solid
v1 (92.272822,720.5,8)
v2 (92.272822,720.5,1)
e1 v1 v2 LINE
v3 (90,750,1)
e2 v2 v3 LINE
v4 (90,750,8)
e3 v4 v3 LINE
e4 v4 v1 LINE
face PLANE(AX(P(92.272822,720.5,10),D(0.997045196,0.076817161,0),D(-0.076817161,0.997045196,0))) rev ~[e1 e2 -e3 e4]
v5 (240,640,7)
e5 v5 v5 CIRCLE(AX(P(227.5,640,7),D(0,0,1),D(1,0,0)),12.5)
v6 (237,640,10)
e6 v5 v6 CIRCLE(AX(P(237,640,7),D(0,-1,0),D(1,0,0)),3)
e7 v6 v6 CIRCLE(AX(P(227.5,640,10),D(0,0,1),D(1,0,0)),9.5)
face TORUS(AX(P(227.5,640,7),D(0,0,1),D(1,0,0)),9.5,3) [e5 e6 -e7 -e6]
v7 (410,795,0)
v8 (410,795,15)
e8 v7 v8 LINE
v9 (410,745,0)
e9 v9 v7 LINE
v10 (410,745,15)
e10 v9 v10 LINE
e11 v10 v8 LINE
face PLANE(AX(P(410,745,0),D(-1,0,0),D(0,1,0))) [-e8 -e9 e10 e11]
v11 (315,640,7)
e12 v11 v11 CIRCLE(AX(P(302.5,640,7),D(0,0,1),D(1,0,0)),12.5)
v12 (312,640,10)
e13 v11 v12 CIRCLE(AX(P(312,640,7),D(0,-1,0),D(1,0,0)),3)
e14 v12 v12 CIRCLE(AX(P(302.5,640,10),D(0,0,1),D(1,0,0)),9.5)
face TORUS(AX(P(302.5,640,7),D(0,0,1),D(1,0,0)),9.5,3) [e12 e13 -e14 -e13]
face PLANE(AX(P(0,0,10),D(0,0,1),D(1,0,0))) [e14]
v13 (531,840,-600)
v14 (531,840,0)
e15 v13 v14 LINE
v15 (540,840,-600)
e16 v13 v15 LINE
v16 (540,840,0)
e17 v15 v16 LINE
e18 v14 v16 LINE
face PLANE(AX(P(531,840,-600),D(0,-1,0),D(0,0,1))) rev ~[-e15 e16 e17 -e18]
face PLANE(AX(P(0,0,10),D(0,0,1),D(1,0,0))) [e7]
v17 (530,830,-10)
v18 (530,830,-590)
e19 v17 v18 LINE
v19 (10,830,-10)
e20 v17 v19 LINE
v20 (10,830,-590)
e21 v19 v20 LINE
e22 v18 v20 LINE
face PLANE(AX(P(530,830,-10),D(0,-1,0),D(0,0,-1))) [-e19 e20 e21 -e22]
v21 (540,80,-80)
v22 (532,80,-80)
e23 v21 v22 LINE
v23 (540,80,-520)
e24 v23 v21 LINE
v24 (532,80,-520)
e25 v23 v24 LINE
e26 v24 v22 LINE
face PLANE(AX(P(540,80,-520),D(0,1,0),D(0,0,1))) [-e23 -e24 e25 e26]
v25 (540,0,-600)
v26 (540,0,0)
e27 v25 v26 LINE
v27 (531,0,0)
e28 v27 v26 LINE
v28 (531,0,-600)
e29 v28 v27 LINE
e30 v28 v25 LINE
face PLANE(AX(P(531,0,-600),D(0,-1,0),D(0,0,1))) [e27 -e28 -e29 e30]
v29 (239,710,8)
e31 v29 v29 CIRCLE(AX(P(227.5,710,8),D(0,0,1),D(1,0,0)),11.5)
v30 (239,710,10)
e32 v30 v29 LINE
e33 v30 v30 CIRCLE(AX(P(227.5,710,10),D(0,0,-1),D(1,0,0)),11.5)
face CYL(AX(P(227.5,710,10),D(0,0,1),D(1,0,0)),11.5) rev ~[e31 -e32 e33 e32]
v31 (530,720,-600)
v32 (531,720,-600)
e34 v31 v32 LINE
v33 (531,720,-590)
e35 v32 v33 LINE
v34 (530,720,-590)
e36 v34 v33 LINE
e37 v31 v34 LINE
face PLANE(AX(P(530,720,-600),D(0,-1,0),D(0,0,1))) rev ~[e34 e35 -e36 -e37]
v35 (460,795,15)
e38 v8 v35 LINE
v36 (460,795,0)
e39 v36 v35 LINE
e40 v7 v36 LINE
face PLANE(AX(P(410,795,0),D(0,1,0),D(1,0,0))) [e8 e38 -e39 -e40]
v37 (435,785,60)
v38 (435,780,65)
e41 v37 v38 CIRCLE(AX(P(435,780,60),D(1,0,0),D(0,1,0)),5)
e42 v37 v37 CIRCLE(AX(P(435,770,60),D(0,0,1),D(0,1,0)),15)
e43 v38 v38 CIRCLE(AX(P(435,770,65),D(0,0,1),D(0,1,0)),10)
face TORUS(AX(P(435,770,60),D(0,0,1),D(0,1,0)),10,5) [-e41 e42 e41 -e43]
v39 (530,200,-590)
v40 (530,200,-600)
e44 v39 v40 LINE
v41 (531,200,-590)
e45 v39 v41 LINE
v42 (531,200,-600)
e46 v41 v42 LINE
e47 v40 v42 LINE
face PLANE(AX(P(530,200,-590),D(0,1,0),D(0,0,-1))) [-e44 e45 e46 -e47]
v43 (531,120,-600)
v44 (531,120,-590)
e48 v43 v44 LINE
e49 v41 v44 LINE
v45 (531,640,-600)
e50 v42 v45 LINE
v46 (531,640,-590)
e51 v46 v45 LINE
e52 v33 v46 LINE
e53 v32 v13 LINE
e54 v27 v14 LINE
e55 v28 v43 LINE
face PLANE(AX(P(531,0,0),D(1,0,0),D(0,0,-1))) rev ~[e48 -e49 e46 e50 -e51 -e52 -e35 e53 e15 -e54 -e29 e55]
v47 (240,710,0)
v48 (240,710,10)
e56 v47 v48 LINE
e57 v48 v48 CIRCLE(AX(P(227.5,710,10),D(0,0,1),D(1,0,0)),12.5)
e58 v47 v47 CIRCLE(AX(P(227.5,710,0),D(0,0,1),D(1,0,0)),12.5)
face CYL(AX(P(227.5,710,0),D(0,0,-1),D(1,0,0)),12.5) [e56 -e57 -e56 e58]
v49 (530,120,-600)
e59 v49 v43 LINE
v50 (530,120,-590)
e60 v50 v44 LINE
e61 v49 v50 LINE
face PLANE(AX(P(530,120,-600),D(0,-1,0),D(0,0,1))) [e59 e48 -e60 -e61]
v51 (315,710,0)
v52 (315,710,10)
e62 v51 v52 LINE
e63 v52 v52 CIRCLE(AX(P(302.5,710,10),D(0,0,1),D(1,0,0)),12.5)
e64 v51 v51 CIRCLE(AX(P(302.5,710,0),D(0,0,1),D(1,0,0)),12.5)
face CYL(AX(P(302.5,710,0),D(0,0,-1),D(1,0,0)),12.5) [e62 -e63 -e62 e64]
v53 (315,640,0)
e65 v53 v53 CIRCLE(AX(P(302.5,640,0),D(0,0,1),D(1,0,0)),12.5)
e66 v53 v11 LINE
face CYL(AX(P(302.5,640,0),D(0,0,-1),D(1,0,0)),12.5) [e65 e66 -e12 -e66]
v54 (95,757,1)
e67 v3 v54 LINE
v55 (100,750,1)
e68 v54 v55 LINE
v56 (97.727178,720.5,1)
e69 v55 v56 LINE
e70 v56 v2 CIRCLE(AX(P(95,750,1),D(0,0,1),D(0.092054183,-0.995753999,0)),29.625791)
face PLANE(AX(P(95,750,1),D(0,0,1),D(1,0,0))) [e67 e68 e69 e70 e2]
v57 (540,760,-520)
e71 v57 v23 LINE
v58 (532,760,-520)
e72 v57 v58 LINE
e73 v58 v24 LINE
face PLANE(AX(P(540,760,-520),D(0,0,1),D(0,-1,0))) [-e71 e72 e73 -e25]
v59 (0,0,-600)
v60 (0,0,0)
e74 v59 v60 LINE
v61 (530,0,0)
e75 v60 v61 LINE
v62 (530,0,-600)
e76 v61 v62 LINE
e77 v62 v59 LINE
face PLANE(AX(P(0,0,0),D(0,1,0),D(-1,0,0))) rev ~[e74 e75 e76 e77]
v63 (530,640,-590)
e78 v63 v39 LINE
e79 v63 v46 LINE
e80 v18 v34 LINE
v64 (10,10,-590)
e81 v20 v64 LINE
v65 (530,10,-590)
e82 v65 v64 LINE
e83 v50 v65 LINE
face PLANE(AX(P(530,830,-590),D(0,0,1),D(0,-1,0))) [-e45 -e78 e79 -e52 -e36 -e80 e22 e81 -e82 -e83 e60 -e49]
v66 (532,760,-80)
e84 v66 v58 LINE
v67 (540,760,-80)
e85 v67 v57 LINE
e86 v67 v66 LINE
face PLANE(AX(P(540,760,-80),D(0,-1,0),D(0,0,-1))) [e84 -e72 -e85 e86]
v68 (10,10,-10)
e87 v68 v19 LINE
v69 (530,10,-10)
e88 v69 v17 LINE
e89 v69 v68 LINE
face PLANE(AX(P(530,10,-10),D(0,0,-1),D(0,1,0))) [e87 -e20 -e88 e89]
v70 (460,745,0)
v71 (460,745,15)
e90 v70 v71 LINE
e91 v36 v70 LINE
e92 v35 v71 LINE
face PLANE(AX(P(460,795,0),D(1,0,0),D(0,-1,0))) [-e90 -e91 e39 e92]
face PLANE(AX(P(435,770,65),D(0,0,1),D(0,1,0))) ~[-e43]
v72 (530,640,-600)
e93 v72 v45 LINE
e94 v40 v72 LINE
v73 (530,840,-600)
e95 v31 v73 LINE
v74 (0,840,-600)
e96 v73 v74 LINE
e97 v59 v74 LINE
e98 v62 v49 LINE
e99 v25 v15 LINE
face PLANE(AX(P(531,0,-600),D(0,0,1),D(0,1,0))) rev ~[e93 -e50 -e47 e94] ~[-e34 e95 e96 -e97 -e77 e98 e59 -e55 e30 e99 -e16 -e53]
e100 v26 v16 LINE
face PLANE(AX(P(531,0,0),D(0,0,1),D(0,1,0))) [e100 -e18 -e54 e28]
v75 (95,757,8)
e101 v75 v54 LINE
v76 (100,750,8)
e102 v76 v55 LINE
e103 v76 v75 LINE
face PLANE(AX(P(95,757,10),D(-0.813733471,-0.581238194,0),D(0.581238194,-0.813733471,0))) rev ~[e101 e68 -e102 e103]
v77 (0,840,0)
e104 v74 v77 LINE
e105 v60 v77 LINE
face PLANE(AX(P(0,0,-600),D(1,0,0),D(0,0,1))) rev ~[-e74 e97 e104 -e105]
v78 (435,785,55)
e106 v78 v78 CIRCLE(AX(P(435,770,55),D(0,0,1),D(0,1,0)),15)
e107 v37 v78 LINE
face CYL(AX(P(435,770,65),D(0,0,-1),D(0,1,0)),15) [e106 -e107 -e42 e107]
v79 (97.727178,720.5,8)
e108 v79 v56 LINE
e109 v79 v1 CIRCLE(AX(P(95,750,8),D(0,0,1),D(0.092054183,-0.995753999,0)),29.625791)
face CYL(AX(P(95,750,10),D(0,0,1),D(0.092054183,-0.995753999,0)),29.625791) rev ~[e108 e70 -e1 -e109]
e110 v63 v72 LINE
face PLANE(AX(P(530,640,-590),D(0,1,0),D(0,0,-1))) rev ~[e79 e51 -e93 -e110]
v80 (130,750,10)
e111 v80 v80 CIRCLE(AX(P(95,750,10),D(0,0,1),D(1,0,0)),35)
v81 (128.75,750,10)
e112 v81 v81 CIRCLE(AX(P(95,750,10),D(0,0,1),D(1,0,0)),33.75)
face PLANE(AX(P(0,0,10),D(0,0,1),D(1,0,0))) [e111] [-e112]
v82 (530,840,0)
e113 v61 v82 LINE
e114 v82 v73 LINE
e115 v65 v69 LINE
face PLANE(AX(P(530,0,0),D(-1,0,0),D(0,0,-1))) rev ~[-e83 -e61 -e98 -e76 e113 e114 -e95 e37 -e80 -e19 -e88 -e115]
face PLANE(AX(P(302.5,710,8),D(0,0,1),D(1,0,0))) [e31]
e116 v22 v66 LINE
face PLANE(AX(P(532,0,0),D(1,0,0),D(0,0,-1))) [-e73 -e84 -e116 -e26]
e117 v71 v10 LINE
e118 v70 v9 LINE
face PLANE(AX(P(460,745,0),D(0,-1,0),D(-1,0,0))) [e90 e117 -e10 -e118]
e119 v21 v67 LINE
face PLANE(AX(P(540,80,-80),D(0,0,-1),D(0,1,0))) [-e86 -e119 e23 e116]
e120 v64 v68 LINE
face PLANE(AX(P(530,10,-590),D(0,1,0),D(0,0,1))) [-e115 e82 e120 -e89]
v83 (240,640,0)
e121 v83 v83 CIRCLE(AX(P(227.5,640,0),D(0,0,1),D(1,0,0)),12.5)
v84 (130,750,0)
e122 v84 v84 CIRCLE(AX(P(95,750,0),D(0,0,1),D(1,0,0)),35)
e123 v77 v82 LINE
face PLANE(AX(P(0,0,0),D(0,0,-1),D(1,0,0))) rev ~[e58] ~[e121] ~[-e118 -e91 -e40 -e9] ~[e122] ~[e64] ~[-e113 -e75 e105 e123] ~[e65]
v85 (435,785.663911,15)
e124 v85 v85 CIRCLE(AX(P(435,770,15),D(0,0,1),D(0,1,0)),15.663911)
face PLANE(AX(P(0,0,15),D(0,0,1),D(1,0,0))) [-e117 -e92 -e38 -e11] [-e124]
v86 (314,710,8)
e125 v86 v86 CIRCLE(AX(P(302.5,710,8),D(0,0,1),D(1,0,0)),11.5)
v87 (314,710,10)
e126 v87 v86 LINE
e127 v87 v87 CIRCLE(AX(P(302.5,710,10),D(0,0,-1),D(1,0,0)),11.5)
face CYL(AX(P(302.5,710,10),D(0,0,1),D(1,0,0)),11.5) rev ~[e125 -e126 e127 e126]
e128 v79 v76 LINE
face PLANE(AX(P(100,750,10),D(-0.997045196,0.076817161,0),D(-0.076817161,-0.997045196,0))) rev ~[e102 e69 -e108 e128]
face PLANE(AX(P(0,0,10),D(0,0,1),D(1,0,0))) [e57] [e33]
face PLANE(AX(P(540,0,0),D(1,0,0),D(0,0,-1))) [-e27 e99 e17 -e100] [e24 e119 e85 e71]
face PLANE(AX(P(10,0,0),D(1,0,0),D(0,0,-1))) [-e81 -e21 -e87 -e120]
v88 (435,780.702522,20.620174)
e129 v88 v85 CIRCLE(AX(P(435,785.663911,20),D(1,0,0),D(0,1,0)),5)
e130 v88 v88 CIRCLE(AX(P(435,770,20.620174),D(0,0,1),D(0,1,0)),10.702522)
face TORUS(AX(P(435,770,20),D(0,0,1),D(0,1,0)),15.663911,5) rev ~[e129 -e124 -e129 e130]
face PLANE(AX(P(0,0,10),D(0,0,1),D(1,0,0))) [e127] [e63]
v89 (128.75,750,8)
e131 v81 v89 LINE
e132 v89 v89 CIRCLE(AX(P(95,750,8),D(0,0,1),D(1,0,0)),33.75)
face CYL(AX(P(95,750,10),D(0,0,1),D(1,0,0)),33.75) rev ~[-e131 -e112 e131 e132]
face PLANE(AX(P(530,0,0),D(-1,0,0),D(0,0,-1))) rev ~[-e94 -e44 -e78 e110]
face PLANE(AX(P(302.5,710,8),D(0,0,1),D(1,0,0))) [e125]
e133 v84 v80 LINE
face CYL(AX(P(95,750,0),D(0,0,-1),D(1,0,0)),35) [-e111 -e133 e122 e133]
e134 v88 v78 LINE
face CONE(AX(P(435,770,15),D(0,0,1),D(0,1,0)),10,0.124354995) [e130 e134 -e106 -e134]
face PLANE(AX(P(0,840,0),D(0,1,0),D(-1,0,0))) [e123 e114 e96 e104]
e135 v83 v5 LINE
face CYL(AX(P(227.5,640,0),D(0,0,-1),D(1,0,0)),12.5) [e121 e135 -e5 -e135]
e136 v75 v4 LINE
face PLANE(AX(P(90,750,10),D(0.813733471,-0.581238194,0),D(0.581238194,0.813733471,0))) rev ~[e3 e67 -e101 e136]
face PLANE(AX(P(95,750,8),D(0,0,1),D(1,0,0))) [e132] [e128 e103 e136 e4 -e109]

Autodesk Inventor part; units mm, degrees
ref_plane "YZ Plane" through (0, 0, 0) normal (1, 0, 0) x (0, 1, 0)
ref_plane "XZ Plane" through (0, 0, 0) normal (0, 1, 0) x (-1, 0, 0)
ref_plane "XY Plane" through (0, 0, 0) normal (0, 0, 1) x (1, 0, 0)
sketch "Boceto1" plane through (0, 0, 0) normal (0, 1, 0) x (-1, 0, 0)
  line L0 (0, 0) -> (-530, 0)
  line L1 (-530, 0) -> (-530, -600)
  line L2 (-530, -600) -> (0, -600)
  line L3 (0, -600) -> (0, 0)
  dimension "d0" = 530
  dimension "d1" = 600
extrude "Extrusión1" add sketch "Boceto1" along normal blind 840
sketch "Boceto2" plane through (530, 0, 0) normal (1, 0, 0) x (0, 0, -1)
  line L0 (0, 0) -> (0, 840) projected
  line L1 (0, 840) -> (10, 840)
  line L2 (10, 840) -> (10, 830)
  line L3 (10, 830) -> (0, 830)
  line L4 (0, 830) -> (0, 840)
  line L5 (10, 830) -> (590, 830)
  line L6 (590, 830) -> (590, 10)
  line L7 (590, 10) -> (10, 10)
  line L8 (10, 10) -> (10, 830)
  dimension "d4" = 10
  dimension "d5" = 10
  dimension "d6" = 580
  dimension "d7" = 820
extrude "Extrusión2" cut sketch "Boceto2" against normal blind 520 contours L5 L6 L7 L8
sketch "Boceto3" plane through (0, 0, 0) normal (0, 0, 1) x (1, 0, 0)
  line L0 (530, 830) -> (10, 830) projected
  line L1 (10, 830) -> (520, 830) construction
  line L2 (520, 830) -> (520, 580) construction
  line L3 (520, 580) -> (10, 580) construction
  line L4 (10, 580) -> (10, 830) construction
  line L5 (265, 830) -> (265, 580) construction
  line L6 (265, 580) -> (265, 640)
  line L7 (265, 640) -> (290, 640) construction
  line L8 (265, 640) -> (240, 640) construction
  line L9 (290, 640) -> (302.5, 640) construction
  line L10 (240, 640) -> (227.5, 640) construction
  circle A0 centre (302.5, 640) radius 12.5
  circle A1 centre (227.5, 640) radius 12.5
  line L11 (227.5, 640) -> (227.5, 710) construction
  line L12 (302.5, 640) -> (302.5, 710) construction
  circle A2 centre (227.5, 710) radius 12.5
  circle A3 centre (302.5, 710) radius 12.5
  line L13 (10, 830) -> (10, 10) construction
  line L14 (10, 830) -> (10, 705) construction
  point P0 (0, 0)
  dimension "d10" = 510
  dimension "d11" = 250
  dimension "d12" = 255
  dimension "d13" = 0
  dimension "d14" = 60
  dimension "d15" = 25
  dimension "d16" = 25
  dimension "d17" = 12.5
  dimension "d18" = 12.5
  dimension "d19" = 70
  dimension "d20" = 70
  dimension "d21" = 25
  dimension "d22" = 25
  dimension "d23" = 125
extrude "Extrusión3" add sketch "Boceto3" along normal blind 10
sketch "Boceto4" plane through (302.5, 710, 10) normal (0, 0, 1) x (1, 0, 0)
  circle A0 centre (0, 0) radius 11.5
  circle A1 centre (-75, 0) radius 12.5 projected
  circle A2 centre (-75, 0) radius 11.5
  circle A3 centre (-75, 0) radius 12.5
  circle A4 centre (0, -70) radius 12.5 projected
  circle A5 centre (-75, 0) radius 12.5 projected
  circle A6 centre (-75, -70) radius 12.5 projected
  circle A7 centre (0, 0) radius 12.5 projected
  line L0 (-302.5, -710) -> (227.5, -710) projected
  line L1 (227.5, -710) -> (227.5, 130) projected
  line L2 (-302.5, 130) -> (227.5, 130) projected
  line L3 (-302.5, -710) -> (-302.5, 130) projected
  line L4 (-302.5, -710) -> (-302.5, 130) projected
  line L5 (0, 0) -> (-302.5, 0)
  line L6 (-302.5, 0) -> (-302.5, -710)
  line L7 (-302.5, -710) -> (0, -710)
  line L8 (0, -710) -> (0, 0)
  dimension "d26" = 23
  dimension "d27" = 23
  dimension "d29" = 75
  dimension "d30" = 710
  dimension "d31" = 302.5
extrude "Extrusión4" cut sketch "Boceto4" against normal blind 2 contours A0 L8 L5 | L5 L8 A0 | L5 A2 | A2 L5
fillet "Empalme1" radius 3 2 edges at (215, 640, 10) (290, 640, 10)
sketch "Boceto5" plane through (0, 0, 0) normal (0, 0, 1) x (1, 0, 0)
  circle A0 centre (302.5, 640) radius 12.5 projected
  circle A1 centre (227.5, 710) radius 12.5 projected
  circle A2 centre (227.5, 640) radius 12.5 projected
  circle A3 centre (302.5, 710) radius 12.5 projected
  line L0 (0, 0) -> (530, 0) projected
  line L1 (530, 0) -> (530, 840) projected
  line L2 (0, 840) -> (530, 840) projected
  line L3 (0, 0) -> (0, 840) projected
  line L4 (530, 830) -> (10, 830) construction
  line L5 (10, 830) -> (520, 830) construction
  line L6 (520, 830) -> (520, 630) construction
  line L7 (520, 630) -> (10, 630) construction
  line L8 (10, 630) -> (10, 830) construction
  line L9 (520, 630) -> (435, 630) construction
  line L10 (435, 630) -> (435, 770) construction
  line L11 (10, 630) -> (75, 630) construction
  line L12 (75, 630) -> (75, 770) construction
  line L13 (435, 770) -> (435, 795) construction
  line L14 (435, 795) -> (410, 795) construction
  line L15 (410, 795) -> (460, 795)
  line L16 (460, 795) -> (460, 745)
  line L17 (460, 745) -> (410, 745)
  line L18 (410, 745) -> (410, 795)
  dimension "d35" = 510
  dimension "d36" = 200
  dimension "d37" = 85
  dimension "d38" = 140
  dimension "d39" = 65
  dimension "d40" = 140
  dimension "d41" = 25
  dimension "d42" = 25
  dimension "d43" = 50
  dimension "d44" = 50
extrude "Extrusión5" add sketch "Boceto5" along normal blind 15 contours L15 L16 L17 L18
sketch "Boceto7" plane through (0, 0, 15) normal (0, 0, 1) x (1, 0, 0)
  line L0 (410, 745) -> (460, 745) construction
  line L1 (460, 745) -> (460, 795) construction
  line L2 (460, 795) -> (410, 795) construction
  line L3 (410, 795) -> (410, 745) construction
  line L4 (460, 745) -> (410, 745) construction
  line L5 (410, 745) -> (435, 745) construction
  line L6 (435, 745) -> (435, 770) construction
  line L7 (435, 770) -> (410, 770) construction
  line L8 (410, 770) -> (410, 745) construction
  point P0 (0, 0)
  dimension "d53" = 25
  dimension "d54" = 25
ref_plane "Plano de trabajo1" through (435, 770, 15) normal (-1, 0, 0) x (0, -1, 0)
sketch "Boceto8" plane through (435, 770, 15) normal (-1, 0, 0) x (0, -1, 0)
  line L0 (-25, 0) -> (25, 0) construction
  line L1 (0, 0) -> (0, 50)
  line L2 (0, 0) -> (50, 0) construction
  line L3 (0, 50) -> (-15, 50)
  line L4 (0, 50) -> (15, 50) construction
  line L5 (-15, 50) -> (-15, 40)
  line L6 (0, 0) -> (-10, 0)
  line L7 (-10, 0) -> (-15, 40)
  point P0 (770, -15)
  dimension "d55" = 50
  dimension "d56" = 90
  dimension "d57" = 15
  dimension "d58" = 180
  dimension "d59" = 10
  dimension "d60" = 10
revolve "Revolución1" add sketch "Boceto8" angle 360 about axis through (435, 770, 15) along (0, 0, 1)
fillet "Empalme3" radius 5 1 edges at (435, 755, 65)
fillet "Empalme4" radius 5 1 edges at (435, 760, 15)
sketch "Boceto9" plane through (0, 0, 0) normal (0, 0, 1) x (1, 0, 0)
  line L0 (530, 830) -> (10, 830) construction
  line L1 (10, 830) -> (10, 10) construction
  line L2 (10, 830) -> (520, 830) construction
  line L3 (520, 830) -> (520, 630) construction
  line L4 (520, 630) -> (10, 630) construction
  line L5 (10, 630) -> (10, 830) construction
  line L6 (10, 630) -> (95, 630) construction
  line L7 (95, 630) -> (95, 750) construction
  line L8 (95, 750) -> (10, 750) construction
  line L9 (10, 750) -> (10, 630) construction
  line L10 (95, 750) -> (95, 785) construction
  circle A0 centre (95, 750) radius 35
  point P0 (0, 0)
  dimension "d64" = 510
  dimension "d65" = 200
  dimension "d66" = 85
  dimension "d67" = 120
  dimension "d68" = 35
  dimension "d69" = 70
extrude "Extrusión7" add sketch "Boceto9" along normal blind 10
sketch "Boceto10" plane through (95, 750, 10) normal (0, 0, 1) x (1, 0, 0)
  circle A0 centre (0, 0) radius 30
  line L0 (0, 0) -> (0, 7) construction
  line L1 (0, 0) -> (-5, 0) construction
  line L2 (0, 0) -> (5, 0) construction
  line L3 (0, -30) -> (0, -29.5) construction
  line L4 (0, -29.5) -> (5.454356, -29.5) construction
  line L5 (0, -29.5) -> (-5.454356, -29.5) construction
  line L6 (0, -29.5) -> (-2.727178, -29.5) construction
  line L7 (0, -29.5) -> (2.727178, -29.5) construction
  line L8 (-5, 0) -> (0, 7)
  line L9 (0, 7) -> (5, 0)
  line L10 (2.727178, -29.5) -> (5, 0)
  line L11 (-5, 0) -> (-2.727178, -29.5)
  circle A1 centre (0, 0) radius 35
  circle A2 centre (0, 0) radius 29.625791
  point P0 (-95, -750)
  point P1 (2.727178, -29.5)
  dimension "d72" = 60
  dimension "d73" = 7
  dimension "d74" = 5
  dimension "d75" = 5
  dimension "d76" = 0.5
sketch "Boceto10 outline for Extrusión8" plane through (95, 750, 10) normal (0, 0, 1) x (1, 0, 0)
  line L0 (0, 7) -> (5, 0)
  line L1 (-5, 0) -> (0, 7)
  line L2 (-2.727178, -29.5) -> (-5, 0)
  arc A0 (2.727178, -29.5) -> (-2.727178, -29.5) centre (0, 0) ccw
  line L3 (5, 0) -> (2.727178, -29.5)
extrude "Extrusión8" cut sketch "Boceto10 outline for Extrusión8" against normal blind 9
sketch "Boceto11" plane through (95, 750, 10) normal (0, 0, 1) x (1, 0, 0)
  circle A0 centre (0, 0) radius 33.75
  point P0 (-95, -750)
  dimension "d79" = 67.5
extrude "Extrusión9" cut sketch "Boceto11" against normal blind 2
sketch "Boceto12" plane through (530, 0, 0) normal (1, 0, 0) x (0, 0, -1)
  line L0 (10, 830) -> (590, 830) construction
  line L1 (590, 830) -> (590, 10) construction
  line L2 (590, 10) -> (10, 10) construction
  line L3 (10, 10) -> (10, 830) construction
  line L4 (0, 0) -> (600, 0) construction
  line L5 (600, 0) -> (600, 840) construction
  line L6 (0, 840) -> (600, 840) construction
  line L7 (0, 0) -> (0, 840) construction
  line L8 (600, 0) -> (600, 840) construction
  line L9 (600, 840) -> (600, 720) construction
  line L10 (600, 0) -> (0, 0) construction
  line L11 (600, 0) -> (600, 120) construction
  line L12 (590, 830) -> (590, 10) projected
  line L13 (600, 120) -> (590, 120)
  line L14 (590, 120) -> (590, 200)
  line L15 (590, 200) -> (600, 200)
  line L16 (600, 200) -> (600, 120)
  line L17 (600, 720) -> (590, 720)
  line L18 (590, 720) -> (590, 640)
  line L19 (590, 640) -> (600, 640)
  line L20 (600, 640) -> (600, 720)
  dimension "d82" = 120
  dimension "d83" = 120
  dimension "d84" = 80
  dimension "d85" = 80
extrude "Extrusión10" add sketch "Boceto12" along normal blind 1
sketch "Boceto13" plane through (531, 0, 0) normal (1, 0, 0) x (0, 0, -1)
  line L0 (600, 0) -> (0, 0) projected
  line L1 (0, 0) -> (0, 840) projected
  line L2 (600, 840) -> (0, 840) projected
  line L3 (600, 0) -> (600, 840) projected
extrude "Extrusión11" add sketch "Boceto13" along normal blind 9
sketch "Boceto14" plane through (540, 0, 0) normal (1, 0, 0) x (0, 0, -1)
  line L0 (0, 0) -> (600, 0) construction
  line L1 (600, 0) -> (600, 840) construction
  line L2 (600, 840) -> (0, 840) construction
  line L3 (0, 840) -> (0, 0) construction
  line L4 (0, 840) -> (0, 0) construction
  line L5 (0, 840) -> (80, 840) construction
  line L6 (80, 840) -> (80, 760) construction
  line L7 (80, 760) -> (0, 760) construction
  line L8 (0, 760) -> (0, 840) construction
  line L9 (600, 0) -> (520, 0) construction
  line L10 (520, 0) -> (520, 80) construction
  line L11 (520, 80) -> (600, 80) construction
  line L12 (600, 80) -> (600, 0) construction
  line L13 (80, 760) -> (520, 760)
  line L14 (520, 760) -> (520, 80)
  line L15 (520, 80) -> (80, 80)
  line L16 (80, 80) -> (80, 760)
  dimension "d90" = 80
  dimension "d91" = 80
  dimension "d92" = 80
  dimension "d93" = 80
extrude "Extrusión12" cut sketch "Boceto14" against normal blind 8
properties part number "Tablero Maya"
